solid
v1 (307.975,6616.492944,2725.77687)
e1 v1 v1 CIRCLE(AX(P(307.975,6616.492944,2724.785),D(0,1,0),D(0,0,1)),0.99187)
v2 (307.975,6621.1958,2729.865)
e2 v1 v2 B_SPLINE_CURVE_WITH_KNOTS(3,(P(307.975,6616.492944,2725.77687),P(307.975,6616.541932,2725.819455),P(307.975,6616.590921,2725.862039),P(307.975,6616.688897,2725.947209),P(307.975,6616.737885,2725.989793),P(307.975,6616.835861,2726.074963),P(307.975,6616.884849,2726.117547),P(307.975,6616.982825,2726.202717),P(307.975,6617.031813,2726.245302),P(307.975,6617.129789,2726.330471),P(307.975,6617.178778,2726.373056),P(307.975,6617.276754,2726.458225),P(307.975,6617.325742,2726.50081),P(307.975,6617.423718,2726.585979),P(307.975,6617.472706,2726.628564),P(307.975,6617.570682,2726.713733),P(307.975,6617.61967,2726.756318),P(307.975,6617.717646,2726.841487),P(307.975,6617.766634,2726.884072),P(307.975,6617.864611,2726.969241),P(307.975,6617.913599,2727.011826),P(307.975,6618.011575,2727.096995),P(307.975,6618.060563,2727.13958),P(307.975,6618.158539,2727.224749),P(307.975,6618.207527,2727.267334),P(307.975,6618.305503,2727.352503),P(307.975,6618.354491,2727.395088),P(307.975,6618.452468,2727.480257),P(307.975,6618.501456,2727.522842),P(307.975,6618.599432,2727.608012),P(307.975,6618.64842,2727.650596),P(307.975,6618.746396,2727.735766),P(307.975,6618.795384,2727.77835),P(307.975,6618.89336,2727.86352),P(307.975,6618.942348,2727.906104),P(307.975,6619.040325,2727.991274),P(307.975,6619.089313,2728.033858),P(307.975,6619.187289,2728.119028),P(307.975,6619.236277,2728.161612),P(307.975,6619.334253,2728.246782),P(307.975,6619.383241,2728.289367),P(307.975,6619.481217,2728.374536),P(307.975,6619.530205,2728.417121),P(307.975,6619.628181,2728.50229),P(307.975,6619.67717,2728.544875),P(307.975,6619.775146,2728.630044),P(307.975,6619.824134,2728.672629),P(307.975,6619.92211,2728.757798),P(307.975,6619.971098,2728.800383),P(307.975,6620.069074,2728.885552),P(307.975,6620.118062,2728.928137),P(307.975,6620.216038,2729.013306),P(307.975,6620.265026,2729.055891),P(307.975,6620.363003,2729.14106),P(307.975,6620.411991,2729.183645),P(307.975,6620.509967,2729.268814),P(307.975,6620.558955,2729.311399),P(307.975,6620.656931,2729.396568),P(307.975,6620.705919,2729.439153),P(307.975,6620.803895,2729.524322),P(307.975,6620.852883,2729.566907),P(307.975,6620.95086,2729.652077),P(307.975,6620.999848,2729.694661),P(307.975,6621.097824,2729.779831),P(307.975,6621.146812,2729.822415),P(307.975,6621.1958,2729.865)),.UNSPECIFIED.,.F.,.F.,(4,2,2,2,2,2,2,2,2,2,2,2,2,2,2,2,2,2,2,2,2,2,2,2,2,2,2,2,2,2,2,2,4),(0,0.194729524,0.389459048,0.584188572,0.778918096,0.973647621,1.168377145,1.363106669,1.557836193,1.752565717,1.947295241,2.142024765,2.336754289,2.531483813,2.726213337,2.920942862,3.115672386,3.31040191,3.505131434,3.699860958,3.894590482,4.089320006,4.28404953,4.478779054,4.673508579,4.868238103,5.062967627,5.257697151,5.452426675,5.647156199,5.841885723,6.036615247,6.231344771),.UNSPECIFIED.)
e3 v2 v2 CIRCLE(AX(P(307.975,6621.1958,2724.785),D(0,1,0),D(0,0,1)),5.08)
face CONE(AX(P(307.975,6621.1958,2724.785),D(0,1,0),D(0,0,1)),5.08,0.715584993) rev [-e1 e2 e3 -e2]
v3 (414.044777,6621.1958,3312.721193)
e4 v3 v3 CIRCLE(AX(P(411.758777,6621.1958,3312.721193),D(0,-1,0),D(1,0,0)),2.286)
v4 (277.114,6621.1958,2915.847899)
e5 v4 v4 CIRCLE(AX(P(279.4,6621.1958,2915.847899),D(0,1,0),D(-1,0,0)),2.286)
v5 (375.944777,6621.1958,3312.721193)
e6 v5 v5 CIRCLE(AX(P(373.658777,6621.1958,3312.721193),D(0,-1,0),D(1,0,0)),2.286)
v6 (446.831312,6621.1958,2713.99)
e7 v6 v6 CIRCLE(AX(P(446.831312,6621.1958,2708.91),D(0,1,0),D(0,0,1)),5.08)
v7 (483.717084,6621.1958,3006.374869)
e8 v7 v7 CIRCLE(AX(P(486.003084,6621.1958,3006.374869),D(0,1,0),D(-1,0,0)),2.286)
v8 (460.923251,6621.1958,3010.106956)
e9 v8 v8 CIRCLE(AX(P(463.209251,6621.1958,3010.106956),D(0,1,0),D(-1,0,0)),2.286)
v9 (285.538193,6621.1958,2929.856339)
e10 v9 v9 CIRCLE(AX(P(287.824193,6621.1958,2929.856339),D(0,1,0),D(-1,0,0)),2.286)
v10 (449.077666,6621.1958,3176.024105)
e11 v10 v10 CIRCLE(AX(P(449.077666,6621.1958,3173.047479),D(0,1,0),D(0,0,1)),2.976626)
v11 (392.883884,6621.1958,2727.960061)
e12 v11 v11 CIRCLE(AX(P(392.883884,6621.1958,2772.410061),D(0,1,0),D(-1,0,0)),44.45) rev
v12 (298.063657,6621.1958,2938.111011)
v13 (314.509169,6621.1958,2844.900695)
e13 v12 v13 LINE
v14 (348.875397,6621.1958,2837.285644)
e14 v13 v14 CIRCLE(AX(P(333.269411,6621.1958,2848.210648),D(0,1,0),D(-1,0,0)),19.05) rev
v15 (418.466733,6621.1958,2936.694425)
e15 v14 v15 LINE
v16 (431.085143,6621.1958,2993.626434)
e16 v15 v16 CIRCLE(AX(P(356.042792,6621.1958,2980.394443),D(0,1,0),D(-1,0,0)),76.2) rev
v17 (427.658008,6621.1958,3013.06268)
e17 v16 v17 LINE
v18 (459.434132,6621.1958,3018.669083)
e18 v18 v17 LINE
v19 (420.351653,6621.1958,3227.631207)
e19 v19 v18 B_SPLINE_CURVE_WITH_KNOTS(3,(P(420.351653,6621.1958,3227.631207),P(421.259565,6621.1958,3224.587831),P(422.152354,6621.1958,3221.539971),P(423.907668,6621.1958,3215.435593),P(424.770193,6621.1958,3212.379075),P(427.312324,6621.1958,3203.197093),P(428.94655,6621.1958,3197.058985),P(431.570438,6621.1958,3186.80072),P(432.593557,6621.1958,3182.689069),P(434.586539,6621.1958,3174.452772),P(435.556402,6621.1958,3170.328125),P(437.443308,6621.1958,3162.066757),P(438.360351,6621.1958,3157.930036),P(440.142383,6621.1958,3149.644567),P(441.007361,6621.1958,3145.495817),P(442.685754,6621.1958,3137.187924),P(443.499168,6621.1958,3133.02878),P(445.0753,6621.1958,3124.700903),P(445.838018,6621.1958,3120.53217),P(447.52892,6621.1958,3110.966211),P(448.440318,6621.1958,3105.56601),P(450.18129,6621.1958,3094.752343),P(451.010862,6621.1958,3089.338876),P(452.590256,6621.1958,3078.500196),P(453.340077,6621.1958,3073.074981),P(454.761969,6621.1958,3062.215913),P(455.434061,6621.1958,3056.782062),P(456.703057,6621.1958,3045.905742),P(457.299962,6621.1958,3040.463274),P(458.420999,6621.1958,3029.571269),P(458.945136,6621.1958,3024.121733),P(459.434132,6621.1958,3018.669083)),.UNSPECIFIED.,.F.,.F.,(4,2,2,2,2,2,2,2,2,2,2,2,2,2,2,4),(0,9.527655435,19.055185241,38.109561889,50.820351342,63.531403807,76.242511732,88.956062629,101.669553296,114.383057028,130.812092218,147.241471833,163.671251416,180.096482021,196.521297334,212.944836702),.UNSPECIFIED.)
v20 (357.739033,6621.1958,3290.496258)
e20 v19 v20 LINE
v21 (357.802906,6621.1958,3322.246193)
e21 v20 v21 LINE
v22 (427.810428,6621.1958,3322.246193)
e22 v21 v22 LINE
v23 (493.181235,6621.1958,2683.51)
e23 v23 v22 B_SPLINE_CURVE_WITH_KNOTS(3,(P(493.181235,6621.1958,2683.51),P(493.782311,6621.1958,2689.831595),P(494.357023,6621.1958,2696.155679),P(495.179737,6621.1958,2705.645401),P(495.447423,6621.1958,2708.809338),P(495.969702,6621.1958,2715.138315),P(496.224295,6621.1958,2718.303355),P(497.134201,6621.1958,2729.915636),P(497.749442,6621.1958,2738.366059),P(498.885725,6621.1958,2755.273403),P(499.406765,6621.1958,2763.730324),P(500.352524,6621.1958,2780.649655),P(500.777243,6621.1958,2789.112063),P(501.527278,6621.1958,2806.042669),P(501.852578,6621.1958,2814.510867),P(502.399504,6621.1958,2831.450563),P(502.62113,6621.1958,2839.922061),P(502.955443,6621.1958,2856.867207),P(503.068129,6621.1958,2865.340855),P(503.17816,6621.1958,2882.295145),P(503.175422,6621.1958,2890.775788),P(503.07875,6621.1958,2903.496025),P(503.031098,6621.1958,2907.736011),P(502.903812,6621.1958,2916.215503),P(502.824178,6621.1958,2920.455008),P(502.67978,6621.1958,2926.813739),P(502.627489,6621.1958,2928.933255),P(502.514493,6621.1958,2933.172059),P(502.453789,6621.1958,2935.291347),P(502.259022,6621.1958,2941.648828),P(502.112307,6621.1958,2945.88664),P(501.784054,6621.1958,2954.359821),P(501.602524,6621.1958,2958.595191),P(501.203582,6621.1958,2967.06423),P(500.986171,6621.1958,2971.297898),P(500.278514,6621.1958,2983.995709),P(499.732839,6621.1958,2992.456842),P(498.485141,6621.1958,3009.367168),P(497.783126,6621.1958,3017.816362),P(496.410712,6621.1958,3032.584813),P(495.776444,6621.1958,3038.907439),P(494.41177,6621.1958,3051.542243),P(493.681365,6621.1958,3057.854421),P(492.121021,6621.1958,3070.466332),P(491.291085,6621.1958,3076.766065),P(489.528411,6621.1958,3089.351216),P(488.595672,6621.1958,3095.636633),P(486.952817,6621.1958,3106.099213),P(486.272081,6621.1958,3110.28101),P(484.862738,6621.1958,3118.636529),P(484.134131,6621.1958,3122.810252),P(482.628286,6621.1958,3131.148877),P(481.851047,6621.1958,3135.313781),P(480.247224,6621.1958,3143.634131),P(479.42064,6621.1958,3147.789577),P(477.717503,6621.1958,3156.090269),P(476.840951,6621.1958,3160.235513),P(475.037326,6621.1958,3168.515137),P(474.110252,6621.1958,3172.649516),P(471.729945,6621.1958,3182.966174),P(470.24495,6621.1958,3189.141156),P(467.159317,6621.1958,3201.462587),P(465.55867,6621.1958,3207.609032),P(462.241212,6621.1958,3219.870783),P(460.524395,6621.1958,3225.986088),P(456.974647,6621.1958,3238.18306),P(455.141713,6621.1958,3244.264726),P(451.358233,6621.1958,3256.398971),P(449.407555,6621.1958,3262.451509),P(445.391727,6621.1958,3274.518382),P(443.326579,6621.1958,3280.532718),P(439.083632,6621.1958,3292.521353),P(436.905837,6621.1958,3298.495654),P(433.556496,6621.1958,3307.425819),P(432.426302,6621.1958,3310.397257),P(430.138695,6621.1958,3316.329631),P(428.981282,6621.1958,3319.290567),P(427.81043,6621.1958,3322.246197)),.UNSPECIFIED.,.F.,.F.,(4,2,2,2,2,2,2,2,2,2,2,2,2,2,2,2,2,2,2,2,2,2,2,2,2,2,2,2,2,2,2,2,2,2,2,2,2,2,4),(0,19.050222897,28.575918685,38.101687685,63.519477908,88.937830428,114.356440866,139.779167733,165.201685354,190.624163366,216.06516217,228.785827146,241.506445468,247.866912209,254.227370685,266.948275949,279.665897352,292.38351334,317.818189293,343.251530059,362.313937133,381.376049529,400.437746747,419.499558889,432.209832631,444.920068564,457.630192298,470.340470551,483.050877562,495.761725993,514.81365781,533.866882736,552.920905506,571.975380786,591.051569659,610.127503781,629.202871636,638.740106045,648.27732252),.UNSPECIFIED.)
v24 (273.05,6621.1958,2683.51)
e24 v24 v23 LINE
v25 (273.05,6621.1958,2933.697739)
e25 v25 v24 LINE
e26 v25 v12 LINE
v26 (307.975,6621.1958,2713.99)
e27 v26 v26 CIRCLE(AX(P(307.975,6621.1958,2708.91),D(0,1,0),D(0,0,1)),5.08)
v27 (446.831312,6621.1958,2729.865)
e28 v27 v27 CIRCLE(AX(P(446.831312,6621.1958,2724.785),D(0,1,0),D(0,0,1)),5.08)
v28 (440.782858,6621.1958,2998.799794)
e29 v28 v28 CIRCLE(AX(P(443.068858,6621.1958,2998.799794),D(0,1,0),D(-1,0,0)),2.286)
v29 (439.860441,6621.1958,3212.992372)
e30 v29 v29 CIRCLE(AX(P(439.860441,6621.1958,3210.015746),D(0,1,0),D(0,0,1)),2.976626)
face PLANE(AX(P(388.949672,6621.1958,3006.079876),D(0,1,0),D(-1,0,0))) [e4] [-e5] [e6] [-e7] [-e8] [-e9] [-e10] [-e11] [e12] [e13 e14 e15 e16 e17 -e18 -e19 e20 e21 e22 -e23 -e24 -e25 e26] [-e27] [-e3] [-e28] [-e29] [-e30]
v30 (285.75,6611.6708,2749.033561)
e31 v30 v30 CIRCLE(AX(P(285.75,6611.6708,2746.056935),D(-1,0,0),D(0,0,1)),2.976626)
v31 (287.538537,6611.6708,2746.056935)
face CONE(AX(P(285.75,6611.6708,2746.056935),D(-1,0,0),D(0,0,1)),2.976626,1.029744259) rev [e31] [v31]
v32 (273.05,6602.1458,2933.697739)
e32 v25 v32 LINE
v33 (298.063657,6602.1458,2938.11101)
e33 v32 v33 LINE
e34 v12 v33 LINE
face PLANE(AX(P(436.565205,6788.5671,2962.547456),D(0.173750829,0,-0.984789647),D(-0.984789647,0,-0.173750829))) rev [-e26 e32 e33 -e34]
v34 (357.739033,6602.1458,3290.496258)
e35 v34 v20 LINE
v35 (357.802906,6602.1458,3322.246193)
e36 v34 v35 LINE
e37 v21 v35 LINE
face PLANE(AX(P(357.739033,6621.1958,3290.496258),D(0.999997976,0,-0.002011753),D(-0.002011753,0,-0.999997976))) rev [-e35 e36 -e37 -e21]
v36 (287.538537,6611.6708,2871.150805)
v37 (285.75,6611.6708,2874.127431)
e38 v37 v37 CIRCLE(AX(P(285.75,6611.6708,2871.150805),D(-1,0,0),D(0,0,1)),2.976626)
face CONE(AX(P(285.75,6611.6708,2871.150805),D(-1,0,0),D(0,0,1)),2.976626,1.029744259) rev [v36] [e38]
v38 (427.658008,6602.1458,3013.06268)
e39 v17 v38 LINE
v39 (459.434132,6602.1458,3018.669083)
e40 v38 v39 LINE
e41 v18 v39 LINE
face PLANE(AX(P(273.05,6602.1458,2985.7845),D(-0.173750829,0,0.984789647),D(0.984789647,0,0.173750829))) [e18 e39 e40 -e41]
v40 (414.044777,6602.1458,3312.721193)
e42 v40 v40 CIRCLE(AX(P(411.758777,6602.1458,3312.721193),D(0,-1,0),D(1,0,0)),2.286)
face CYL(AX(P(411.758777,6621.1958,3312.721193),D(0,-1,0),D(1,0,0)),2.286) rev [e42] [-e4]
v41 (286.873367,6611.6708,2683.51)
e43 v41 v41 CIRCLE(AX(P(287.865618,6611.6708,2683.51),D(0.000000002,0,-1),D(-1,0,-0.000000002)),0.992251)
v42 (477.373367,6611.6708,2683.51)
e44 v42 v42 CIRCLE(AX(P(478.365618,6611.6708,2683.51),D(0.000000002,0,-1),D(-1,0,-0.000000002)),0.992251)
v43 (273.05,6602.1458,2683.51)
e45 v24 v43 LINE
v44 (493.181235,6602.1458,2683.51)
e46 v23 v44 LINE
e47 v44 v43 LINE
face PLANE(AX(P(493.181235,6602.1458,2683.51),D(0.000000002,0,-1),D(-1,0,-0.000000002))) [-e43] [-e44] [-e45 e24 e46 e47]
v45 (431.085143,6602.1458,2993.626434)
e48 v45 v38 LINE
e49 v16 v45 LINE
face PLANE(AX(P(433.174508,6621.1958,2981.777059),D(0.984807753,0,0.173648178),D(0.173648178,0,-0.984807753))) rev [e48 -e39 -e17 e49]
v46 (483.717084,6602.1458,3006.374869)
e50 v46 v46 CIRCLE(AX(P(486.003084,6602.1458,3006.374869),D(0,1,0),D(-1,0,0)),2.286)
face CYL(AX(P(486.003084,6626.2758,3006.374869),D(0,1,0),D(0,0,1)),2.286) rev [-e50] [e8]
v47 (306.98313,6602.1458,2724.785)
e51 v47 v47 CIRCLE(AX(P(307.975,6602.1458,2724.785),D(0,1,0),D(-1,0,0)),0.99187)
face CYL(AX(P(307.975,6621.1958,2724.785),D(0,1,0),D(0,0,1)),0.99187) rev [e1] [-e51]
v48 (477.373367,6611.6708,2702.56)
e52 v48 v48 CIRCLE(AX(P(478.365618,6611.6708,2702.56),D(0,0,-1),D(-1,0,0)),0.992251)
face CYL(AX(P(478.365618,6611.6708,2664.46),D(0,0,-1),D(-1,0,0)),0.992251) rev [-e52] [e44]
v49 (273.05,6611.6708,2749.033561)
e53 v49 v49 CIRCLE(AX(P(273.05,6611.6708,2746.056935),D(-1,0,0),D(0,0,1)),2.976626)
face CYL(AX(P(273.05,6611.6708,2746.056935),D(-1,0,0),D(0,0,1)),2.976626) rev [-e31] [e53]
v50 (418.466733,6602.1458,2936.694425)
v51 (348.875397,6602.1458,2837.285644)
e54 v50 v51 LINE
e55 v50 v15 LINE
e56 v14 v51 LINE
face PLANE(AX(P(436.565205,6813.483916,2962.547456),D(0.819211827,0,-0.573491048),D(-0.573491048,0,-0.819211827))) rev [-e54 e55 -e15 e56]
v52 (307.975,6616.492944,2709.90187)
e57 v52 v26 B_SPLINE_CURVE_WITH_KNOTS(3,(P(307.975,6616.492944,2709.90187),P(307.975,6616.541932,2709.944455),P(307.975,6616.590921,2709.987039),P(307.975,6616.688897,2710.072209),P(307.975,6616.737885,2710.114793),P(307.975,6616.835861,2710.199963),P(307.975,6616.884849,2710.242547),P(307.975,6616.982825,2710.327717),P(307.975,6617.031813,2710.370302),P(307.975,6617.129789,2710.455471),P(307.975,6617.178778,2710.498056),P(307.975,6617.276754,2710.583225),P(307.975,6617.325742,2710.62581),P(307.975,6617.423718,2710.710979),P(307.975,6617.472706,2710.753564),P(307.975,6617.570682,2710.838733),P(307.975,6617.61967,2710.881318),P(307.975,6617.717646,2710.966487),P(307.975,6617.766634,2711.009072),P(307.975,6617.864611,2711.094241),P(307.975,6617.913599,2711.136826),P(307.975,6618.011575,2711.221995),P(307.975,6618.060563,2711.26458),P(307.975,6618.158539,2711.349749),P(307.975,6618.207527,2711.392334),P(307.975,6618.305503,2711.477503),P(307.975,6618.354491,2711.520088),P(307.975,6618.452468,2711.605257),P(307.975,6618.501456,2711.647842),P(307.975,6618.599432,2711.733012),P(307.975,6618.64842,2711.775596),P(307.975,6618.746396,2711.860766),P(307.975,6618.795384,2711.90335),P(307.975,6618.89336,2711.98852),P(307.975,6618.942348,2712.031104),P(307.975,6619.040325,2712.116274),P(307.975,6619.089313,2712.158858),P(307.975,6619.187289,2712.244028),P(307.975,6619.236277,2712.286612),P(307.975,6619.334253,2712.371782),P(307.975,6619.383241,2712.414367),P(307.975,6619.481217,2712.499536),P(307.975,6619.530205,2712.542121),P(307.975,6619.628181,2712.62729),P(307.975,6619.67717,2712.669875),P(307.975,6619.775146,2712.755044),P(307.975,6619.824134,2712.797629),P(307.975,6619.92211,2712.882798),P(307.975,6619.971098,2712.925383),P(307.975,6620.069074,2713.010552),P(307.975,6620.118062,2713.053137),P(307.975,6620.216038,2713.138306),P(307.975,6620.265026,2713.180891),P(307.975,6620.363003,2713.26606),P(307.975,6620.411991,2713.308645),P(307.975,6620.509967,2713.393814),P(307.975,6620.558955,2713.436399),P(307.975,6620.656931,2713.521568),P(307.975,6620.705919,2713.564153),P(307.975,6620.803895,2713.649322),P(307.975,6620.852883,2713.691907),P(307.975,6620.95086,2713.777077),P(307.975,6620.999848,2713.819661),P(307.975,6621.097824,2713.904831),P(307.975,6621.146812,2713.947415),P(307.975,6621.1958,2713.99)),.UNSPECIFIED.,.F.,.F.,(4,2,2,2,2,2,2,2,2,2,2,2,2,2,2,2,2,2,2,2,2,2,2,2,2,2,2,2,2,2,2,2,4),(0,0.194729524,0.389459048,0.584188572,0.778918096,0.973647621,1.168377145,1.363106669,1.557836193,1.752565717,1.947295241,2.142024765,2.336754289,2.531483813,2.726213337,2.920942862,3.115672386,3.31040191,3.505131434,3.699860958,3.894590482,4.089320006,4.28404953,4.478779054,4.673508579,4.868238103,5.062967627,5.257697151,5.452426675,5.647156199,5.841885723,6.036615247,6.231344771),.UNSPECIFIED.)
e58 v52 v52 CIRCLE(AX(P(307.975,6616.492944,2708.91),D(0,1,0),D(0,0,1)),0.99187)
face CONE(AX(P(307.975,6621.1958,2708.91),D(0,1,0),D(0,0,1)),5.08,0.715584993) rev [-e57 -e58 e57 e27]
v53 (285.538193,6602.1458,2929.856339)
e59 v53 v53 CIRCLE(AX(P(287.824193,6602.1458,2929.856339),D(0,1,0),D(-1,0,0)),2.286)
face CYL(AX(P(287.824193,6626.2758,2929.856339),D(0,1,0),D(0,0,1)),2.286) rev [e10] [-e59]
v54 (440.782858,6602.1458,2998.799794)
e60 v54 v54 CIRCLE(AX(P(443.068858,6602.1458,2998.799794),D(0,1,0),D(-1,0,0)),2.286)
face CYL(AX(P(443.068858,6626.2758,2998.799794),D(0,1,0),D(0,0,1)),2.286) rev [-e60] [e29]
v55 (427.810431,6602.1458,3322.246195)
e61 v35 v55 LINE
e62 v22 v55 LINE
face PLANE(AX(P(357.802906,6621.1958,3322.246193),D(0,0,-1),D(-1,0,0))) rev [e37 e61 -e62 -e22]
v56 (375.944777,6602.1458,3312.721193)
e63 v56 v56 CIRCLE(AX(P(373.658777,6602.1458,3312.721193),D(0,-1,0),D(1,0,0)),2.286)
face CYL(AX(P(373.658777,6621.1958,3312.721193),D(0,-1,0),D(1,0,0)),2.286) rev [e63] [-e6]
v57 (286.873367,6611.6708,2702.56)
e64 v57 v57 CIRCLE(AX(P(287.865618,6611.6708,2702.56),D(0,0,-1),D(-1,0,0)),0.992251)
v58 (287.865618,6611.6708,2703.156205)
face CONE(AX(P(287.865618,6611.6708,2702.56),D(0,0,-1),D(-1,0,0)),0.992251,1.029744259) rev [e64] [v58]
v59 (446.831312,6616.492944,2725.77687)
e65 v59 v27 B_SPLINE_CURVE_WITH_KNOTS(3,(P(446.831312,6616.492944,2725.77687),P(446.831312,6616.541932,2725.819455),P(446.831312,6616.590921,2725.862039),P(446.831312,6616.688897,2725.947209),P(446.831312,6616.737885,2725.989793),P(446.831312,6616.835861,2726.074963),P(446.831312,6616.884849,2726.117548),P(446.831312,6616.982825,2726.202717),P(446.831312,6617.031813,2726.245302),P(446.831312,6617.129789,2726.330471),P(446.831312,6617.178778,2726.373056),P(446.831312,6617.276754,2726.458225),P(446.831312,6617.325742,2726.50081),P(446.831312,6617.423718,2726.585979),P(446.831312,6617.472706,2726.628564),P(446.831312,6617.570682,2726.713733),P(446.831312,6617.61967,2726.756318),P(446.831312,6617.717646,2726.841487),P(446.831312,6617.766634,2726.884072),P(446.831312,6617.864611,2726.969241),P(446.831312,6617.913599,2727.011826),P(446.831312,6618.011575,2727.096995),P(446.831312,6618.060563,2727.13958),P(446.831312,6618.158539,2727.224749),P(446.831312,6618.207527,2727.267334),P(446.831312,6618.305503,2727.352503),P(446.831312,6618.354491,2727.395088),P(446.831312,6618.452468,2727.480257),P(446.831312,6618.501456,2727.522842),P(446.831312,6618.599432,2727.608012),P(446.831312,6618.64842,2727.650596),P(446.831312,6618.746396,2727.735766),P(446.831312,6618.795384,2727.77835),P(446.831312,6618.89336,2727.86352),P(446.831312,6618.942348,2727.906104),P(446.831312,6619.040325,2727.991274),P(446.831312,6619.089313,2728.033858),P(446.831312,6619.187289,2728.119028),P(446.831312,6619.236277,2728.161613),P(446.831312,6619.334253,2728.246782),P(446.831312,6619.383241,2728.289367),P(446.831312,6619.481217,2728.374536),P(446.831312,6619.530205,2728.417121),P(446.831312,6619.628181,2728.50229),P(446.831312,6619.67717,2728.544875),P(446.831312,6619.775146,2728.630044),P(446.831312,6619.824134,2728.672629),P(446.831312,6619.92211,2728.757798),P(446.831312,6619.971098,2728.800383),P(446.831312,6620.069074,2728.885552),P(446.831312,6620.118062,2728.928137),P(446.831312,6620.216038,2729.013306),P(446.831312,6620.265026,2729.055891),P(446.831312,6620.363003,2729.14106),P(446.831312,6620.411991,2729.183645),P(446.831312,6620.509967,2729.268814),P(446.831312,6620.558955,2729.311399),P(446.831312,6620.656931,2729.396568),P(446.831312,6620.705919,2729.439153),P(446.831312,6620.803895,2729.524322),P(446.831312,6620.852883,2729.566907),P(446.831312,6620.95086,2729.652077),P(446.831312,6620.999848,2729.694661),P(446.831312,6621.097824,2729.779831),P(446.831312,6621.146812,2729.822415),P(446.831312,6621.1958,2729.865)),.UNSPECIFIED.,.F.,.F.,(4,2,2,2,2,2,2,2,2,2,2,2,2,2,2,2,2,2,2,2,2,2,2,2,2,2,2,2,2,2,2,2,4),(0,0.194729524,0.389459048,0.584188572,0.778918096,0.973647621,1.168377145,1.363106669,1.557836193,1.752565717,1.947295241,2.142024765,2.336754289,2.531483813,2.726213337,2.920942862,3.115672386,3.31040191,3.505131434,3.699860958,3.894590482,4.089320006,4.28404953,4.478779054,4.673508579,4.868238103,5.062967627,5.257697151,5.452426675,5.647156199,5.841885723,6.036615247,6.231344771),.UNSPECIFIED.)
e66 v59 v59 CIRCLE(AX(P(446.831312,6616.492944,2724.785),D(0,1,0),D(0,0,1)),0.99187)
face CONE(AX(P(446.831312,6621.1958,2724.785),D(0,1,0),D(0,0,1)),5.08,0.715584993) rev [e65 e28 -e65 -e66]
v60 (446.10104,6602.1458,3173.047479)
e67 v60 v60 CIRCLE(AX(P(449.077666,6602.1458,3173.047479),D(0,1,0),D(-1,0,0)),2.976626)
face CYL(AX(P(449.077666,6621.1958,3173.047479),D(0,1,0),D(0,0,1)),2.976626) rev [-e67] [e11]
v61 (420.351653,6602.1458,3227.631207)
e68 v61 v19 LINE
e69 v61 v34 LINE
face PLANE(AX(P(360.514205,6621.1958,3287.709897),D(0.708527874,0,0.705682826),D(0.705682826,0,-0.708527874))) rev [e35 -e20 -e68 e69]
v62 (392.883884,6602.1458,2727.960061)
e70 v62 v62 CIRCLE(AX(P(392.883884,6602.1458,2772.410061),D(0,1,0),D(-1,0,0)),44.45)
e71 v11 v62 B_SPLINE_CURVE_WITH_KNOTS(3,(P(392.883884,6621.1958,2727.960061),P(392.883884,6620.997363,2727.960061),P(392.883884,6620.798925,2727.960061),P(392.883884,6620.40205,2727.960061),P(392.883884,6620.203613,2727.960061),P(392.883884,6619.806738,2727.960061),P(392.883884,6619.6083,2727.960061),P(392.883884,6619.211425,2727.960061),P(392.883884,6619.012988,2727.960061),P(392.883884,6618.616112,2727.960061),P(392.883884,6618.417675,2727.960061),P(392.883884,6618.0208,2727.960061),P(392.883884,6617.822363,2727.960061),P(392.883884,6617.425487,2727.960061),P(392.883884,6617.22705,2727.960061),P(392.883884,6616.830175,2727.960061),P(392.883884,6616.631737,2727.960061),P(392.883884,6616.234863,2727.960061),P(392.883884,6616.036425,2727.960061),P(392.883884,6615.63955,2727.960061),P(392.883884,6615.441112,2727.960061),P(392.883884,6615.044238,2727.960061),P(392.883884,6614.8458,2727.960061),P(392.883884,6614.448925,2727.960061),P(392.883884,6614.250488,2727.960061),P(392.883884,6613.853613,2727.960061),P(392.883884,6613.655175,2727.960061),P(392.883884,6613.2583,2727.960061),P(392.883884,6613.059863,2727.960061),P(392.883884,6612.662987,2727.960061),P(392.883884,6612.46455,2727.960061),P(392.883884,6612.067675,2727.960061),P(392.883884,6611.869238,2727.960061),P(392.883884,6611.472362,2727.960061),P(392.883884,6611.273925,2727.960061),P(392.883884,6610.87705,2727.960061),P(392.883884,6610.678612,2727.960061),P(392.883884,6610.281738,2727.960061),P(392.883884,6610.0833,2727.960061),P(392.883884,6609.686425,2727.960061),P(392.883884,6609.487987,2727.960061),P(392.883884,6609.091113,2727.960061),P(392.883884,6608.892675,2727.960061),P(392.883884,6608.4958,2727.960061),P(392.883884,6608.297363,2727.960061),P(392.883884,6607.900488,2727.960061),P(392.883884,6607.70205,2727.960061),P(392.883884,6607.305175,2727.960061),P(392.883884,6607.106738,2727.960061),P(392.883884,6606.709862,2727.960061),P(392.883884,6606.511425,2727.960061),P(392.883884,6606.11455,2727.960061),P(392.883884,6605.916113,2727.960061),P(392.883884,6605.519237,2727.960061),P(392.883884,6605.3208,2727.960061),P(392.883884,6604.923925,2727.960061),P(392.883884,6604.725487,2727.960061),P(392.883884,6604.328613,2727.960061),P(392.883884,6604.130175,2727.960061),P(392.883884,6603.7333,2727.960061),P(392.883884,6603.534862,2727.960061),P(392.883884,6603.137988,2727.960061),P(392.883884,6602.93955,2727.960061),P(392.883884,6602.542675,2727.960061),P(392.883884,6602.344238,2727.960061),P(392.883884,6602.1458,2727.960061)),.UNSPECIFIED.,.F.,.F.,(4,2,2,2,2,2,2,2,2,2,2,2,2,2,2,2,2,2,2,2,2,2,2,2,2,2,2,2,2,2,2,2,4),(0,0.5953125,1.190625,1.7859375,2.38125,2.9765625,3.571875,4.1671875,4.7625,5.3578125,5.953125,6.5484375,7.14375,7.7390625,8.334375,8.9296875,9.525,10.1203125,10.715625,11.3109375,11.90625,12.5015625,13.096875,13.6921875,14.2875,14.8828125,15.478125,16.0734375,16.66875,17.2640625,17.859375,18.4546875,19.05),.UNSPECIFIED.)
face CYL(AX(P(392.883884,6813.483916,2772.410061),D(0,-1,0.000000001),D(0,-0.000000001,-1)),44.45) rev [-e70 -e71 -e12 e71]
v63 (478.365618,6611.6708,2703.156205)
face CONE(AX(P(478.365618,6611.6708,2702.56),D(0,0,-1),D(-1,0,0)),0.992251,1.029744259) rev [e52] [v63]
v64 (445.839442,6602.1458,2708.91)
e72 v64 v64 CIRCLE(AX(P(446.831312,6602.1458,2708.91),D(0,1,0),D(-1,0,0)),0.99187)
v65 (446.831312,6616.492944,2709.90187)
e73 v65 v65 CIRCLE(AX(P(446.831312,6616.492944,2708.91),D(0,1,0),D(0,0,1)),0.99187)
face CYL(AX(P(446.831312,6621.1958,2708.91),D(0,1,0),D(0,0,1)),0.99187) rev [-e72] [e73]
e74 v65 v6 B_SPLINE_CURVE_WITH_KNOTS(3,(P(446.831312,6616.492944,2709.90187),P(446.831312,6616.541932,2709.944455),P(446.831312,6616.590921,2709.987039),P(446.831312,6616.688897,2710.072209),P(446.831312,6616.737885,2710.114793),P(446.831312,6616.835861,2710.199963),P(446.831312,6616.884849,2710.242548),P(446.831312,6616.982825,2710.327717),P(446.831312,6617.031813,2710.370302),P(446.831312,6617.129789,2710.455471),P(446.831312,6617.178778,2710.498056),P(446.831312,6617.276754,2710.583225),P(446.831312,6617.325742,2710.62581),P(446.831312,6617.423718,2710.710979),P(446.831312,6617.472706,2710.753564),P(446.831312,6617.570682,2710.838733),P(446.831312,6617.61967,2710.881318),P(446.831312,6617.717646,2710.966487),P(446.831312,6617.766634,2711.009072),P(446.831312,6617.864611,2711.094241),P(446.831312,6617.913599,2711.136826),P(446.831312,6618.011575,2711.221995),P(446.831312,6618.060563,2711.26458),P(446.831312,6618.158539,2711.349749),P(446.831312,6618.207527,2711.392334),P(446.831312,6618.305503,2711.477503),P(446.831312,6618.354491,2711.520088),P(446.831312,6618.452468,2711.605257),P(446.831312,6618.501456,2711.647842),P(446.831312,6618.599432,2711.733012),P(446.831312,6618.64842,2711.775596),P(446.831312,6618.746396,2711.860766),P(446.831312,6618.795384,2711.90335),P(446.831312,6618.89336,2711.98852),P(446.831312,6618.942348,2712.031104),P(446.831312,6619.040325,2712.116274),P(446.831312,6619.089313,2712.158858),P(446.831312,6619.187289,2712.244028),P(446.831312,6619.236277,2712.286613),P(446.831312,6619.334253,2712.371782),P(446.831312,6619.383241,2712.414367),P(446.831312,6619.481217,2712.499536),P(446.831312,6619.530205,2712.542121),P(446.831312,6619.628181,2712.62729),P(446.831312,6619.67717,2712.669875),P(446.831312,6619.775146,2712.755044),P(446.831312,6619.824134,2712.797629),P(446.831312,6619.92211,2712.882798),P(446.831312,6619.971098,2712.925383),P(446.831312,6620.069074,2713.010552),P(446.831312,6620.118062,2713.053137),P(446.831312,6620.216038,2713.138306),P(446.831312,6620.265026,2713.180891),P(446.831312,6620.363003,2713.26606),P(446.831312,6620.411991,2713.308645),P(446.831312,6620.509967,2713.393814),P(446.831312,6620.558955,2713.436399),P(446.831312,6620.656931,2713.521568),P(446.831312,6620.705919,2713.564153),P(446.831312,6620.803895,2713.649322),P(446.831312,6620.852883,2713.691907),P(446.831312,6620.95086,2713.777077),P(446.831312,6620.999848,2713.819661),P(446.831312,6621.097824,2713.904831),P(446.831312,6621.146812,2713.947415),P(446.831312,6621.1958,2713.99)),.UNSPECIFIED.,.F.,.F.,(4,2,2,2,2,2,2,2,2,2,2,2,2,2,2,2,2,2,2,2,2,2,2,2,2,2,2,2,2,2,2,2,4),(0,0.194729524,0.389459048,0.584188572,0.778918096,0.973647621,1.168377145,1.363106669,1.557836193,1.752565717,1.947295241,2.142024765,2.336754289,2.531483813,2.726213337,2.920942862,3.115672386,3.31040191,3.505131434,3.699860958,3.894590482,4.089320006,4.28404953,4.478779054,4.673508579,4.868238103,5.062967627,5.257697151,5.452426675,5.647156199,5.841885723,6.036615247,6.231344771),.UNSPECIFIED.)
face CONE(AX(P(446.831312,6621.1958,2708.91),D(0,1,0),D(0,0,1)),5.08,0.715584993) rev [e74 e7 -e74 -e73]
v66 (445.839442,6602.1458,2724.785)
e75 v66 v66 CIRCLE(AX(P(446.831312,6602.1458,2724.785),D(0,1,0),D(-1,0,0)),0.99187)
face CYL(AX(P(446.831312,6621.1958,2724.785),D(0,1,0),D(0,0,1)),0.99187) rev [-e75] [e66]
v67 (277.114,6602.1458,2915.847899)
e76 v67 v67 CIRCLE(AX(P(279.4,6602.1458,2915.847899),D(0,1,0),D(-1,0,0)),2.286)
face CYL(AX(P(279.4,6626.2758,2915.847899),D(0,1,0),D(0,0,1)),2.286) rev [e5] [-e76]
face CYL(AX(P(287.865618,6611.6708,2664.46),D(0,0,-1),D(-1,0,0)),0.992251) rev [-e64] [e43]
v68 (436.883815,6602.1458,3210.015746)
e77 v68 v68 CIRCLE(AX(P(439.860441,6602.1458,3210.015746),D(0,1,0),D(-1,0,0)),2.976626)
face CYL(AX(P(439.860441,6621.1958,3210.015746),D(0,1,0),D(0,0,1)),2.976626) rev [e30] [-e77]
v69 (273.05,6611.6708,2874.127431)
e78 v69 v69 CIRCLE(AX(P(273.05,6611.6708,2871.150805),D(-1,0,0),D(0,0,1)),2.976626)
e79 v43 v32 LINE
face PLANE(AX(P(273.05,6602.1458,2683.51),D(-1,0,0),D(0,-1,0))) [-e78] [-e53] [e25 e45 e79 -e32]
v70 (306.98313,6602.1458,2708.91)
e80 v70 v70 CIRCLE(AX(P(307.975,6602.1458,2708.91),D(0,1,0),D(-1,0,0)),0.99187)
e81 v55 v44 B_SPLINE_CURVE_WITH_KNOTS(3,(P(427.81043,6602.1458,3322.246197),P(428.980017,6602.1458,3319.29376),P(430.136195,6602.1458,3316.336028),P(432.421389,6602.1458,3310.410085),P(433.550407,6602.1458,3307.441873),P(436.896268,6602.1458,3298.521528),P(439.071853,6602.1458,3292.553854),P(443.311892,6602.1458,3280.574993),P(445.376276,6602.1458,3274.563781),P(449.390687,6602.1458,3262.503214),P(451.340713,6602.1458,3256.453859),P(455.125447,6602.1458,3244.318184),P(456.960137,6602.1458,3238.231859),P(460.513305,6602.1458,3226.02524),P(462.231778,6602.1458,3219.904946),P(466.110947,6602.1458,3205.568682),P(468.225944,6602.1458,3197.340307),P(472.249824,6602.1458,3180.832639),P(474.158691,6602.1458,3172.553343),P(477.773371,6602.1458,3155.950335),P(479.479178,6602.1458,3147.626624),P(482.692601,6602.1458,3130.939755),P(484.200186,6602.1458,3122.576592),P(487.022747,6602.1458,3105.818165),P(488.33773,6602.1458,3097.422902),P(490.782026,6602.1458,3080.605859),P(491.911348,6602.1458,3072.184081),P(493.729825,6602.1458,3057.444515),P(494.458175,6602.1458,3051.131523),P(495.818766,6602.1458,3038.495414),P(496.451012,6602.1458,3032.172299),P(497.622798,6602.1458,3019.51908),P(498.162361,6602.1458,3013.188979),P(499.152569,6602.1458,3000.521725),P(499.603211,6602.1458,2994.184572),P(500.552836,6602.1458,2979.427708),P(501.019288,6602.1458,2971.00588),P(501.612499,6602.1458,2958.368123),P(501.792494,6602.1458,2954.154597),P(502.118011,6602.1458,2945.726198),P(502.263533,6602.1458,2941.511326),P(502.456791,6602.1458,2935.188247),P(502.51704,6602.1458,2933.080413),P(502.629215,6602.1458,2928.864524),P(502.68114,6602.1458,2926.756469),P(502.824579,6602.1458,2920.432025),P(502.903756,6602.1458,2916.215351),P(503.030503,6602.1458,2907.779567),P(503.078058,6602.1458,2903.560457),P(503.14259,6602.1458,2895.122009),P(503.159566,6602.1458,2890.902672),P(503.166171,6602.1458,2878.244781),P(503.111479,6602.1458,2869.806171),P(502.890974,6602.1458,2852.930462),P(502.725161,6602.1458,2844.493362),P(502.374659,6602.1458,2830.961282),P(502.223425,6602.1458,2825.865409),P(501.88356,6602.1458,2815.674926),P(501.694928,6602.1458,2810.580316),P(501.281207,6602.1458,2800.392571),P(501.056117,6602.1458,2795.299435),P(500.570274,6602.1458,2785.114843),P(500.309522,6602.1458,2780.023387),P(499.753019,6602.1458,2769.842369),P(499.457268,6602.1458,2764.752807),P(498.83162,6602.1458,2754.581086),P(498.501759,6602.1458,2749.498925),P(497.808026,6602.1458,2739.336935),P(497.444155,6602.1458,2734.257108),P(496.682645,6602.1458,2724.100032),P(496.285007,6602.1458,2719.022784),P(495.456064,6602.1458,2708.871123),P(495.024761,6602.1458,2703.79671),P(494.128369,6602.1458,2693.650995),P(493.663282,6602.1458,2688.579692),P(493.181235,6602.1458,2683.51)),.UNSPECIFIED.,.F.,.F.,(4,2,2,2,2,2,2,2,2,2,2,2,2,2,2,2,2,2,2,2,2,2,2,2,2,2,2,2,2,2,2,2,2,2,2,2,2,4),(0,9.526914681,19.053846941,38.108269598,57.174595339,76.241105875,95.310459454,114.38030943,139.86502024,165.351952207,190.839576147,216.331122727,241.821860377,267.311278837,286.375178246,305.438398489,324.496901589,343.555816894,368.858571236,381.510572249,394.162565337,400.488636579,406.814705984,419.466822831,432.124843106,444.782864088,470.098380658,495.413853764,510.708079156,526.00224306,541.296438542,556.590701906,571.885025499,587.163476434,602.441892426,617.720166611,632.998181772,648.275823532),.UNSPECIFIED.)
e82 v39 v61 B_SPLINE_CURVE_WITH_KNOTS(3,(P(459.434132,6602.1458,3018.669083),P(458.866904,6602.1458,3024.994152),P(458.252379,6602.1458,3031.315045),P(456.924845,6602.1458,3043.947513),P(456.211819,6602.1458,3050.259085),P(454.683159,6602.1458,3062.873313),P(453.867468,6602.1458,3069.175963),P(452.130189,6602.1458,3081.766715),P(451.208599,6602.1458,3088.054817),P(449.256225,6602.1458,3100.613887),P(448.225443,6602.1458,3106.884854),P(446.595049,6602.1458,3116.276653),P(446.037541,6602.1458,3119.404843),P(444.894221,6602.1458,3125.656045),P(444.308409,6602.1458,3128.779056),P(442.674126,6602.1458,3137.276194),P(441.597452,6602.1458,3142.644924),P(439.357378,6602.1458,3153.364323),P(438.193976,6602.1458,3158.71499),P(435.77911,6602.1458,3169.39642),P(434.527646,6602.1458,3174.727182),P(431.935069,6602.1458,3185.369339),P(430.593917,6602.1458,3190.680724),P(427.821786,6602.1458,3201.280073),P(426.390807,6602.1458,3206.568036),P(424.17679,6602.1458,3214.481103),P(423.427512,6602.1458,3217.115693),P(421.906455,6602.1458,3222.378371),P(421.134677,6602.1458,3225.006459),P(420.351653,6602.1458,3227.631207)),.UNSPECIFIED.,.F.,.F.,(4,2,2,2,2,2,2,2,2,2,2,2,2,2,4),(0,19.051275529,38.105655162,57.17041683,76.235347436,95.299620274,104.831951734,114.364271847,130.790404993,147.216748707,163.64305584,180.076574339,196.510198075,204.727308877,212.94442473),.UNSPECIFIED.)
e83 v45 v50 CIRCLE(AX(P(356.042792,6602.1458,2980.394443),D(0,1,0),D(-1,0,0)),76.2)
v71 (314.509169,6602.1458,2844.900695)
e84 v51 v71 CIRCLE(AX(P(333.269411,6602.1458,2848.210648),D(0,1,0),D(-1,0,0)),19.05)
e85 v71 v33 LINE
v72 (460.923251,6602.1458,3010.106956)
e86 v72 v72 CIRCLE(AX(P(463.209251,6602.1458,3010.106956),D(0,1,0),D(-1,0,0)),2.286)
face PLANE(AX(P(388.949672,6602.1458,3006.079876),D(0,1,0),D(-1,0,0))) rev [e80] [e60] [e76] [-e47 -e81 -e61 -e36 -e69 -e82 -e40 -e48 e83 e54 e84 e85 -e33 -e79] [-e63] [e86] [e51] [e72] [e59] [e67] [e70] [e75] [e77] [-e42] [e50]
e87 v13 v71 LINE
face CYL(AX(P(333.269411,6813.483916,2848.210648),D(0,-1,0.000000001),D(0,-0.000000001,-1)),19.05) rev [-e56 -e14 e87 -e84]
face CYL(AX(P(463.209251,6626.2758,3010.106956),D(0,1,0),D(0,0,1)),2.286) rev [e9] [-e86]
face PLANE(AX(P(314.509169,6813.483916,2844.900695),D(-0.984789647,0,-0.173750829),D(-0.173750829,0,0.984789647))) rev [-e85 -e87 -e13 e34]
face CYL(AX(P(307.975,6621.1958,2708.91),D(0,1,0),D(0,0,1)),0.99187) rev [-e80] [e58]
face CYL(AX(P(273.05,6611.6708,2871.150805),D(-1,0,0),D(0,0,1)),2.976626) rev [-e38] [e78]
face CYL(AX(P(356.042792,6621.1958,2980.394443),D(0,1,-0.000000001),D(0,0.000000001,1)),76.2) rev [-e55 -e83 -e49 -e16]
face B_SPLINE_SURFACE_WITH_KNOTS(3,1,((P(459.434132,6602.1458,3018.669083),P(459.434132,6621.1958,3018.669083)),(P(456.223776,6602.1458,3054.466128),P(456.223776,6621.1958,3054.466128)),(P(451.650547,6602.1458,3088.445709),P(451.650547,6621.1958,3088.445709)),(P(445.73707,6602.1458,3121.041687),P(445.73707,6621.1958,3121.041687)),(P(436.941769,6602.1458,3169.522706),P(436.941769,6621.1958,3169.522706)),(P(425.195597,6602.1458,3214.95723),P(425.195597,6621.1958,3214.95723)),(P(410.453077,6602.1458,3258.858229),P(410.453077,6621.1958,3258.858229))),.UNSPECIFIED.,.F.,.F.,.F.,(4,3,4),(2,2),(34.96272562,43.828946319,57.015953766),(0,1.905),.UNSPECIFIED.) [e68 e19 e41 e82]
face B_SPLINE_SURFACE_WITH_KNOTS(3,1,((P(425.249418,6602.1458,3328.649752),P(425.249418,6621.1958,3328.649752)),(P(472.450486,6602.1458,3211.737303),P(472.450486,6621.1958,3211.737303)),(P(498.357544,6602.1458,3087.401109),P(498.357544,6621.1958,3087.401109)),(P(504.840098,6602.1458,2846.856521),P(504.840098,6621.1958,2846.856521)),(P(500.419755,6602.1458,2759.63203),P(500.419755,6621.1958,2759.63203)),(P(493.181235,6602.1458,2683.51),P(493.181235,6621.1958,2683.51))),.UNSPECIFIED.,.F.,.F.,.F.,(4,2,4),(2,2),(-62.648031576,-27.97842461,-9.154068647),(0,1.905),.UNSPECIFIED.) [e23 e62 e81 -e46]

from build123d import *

# Parameters (mm, degrees)
STOCK_LEFT_START                     = 6602.1458
STOCK_LEFT_CONSOLE_1_OUTLINE_R       = 2.286
STOCK_LEFT_CONSOLE_1_OUTLINE_R_2     = 44.45
STOCK_LEFT_CONSOLE_1_DEPTH           = 19.05
SKETCH1_R                            = 2.286
BOSS_EXTRUDE1_DEPTH                  = 19.05
F_5_64_0_07813_DIAMETER_HOLE1_D      = 1.984502
F_5_64_0_07813_DIAMETER_HOLE1_DEPTH  = 38.1
F_5_64_0_07813_DIAMETER_HOLE1_TIP    = 0.59620455
HOLE1_D                              = 1.98374
HOLE1_DEPTH                          = 19.05
HOLE1_CSINK_D                        = 10.16
HOLE1_CSINK_ANGLE                    = 82
HOLE1_TIP                            = 0.595975622
F_15_64_0_23438_DIAMETER_HOLE1_D     = 5.953252
F_15_64_0_23438_DIAMETER_HOLE1_DEPTH = 12.7
F_15_64_0_23438_DIAMETER_HOLE1_TIP   = 1.788537341
F_15_64_0_23438_DIAMETER_HOLE2_D     = 5.953252


# Read off the part's stored shape, not the designer's step: Stock-Left Console-1
with BuildPart() as part:
    # Stock-Left Console-1 outline → Stock-Left Console-1 (new body)
    with BuildSketch(Plane(origin=(0, 0, 0), x_dir=(1, 0, 0), z_dir=(0, 1, 0)).offset(STOCK_LEFT_START)):
        with BuildLine():
            Line((357.802906487, -3322.246193472), (427.81043067, -3322.246195127))
            add(Edge.make_bspline(
                [(427.81043067, -3322.246195127), (473.388143546, -3207.192047458), (498.434160064, -3084.558176537), (504.840097902, -2846.856520671), (500.419755279, -2759.632030412), (493.181235291, -2683.510000386)],
                knots=[-62.01580073, -62.01580073, -62.01580073, -62.01580073, -27.97842461, -27.97842461, -9.154068647, -9.154068647, -9.154068647, -9.154068647], degree=3))
            Line((493.181235291, -2683.510000386), (273.05, -2683.510000011))
            Line((273.05, -2683.510000011), (273.05, -2933.697739453))
            Line((273.05, -2933.697739453), (298.063657014, -2938.111010516))
            Line((298.063657014, -2938.111010516), (314.509168719, -2844.900694709))
            ThreePointArc((314.509168719, -2844.900694709), (329.148175534, -2829.611779383), (348.875396841, -2837.285643591))
            Line((348.875396841, -2837.285643591), (418.46673346, -2936.69442468))
            ThreePointArc((418.46673346, -2936.69442468), (430.437407433, -2963.905621235), (431.085143003, -2993.626433673))
            Line((431.085143003, -2993.626433673), (427.658008361, -3013.062680059))
            Line((427.658008361, -3013.062680059), (459.43413222, -3018.669083307))
            add(Edge.make_bspline(
                [(459.43413222, -3018.669083307), (456.223775647, -3054.466127933), (451.650547457, -3088.445708947), (445.737069512, -3121.041687467), (439.008868755, -3158.128540481), (430.553849402, -3193.432616991), (420.351653238, -3227.631207238)],
                knots=[34.96272562, 34.96272562, 34.96272562, 34.96272562, 43.828946319, 43.828946319, 43.828946319, 53.916700663, 53.916700663, 53.916700663, 53.916700663], degree=3))
            Line((420.351653238, -3227.631207238), (357.739033333, -3290.49625772))
            Line((357.739033333, -3290.49625772), (357.802906487, -3322.246193472))
        make_face()
        with Locations((373.658776627, -3312.721193497)):
            Circle(STOCK_LEFT_CONSOLE_1_OUTLINE_R, mode=Mode.SUBTRACT)
        with Locations((411.758776627, -3312.721193478)):
            Circle(STOCK_LEFT_CONSOLE_1_OUTLINE_R, mode=Mode.SUBTRACT)
        with Locations((463.209250621, -3010.106955909)):
            Circle(STOCK_LEFT_CONSOLE_1_OUTLINE_R, mode=Mode.SUBTRACT)
        with Locations((486.003084481, -3006.374869262)):
            Circle(STOCK_LEFT_CONSOLE_1_OUTLINE_R, mode=Mode.SUBTRACT)
        with Locations((287.824193289, -2929.856338812)):
            Circle(STOCK_LEFT_CONSOLE_1_OUTLINE_R, mode=Mode.SUBTRACT)
        with Locations((279.4, -2915.847898591)):
            Circle(STOCK_LEFT_CONSOLE_1_OUTLINE_R, mode=Mode.SUBTRACT)
        with Locations((292.1, -2727.960000043)):
            Circle(STOCK_LEFT_CONSOLE_1_OUTLINE_R, mode=Mode.SUBTRACT)
        with Locations((292.1, -2702.559999968)):
            Circle(STOCK_LEFT_CONSOLE_1_OUTLINE_R, mode=Mode.SUBTRACT)
        with Locations((317.5, -2702.559999968)):
            Circle(STOCK_LEFT_CONSOLE_1_OUTLINE_R, mode=Mode.SUBTRACT)
        with Locations((443.068858037, -2998.799793605)):
            Circle(STOCK_LEFT_CONSOLE_1_OUTLINE_R, mode=Mode.SUBTRACT)
        with Locations((392.883884122, -2772.410060986)):
            Circle(STOCK_LEFT_CONSOLE_1_OUTLINE_R_2, mode=Mode.SUBTRACT)
        with Locations((450.85, -2727.960000048)):
            Circle(STOCK_LEFT_CONSOLE_1_OUTLINE_R, mode=Mode.SUBTRACT)
        with Locations((450.85, -2702.560000048)):
            Circle(STOCK_LEFT_CONSOLE_1_OUTLINE_R, mode=Mode.SUBTRACT)
    extrude(amount=STOCK_LEFT_CONSOLE_1_DEPTH)

    # Sketch1 → Boss-Extrude1 (add)
    with BuildSketch(Plane(origin=(0, 6621.1958, 0), x_dir=(1, 0, 0), z_dir=(0, 1, 0))):
        with Locations((292.1, -2727.959998746)):
            Circle(SKETCH1_R)
        with Locations((292.1, -2702.559998672)):
            Circle(SKETCH1_R)
        with Locations((317.5, -2702.559998672)):
            Circle(SKETCH1_R)
        with Locations((450.85, -2702.559998751)):
            Circle(SKETCH1_R)
        with Locations((450.85, -2727.959998751)):
            Circle(SKETCH1_R)
    extrude(amount=-BOSS_EXTRUDE1_DEPTH)

    # 5/64 (0.07813) Diameter Hole1
    with Locations(Plane(origin=(0, 0, 2664.46), x_dir=(-1, 0, 0), z_dir=(0, 0, -1))):
        with Locations((-481.589248274, 6993.254992531), (-386.339248274, 6993.254992531), (-291.089248274, 6993.254992531), (-295.274999999, 6965.135938475), (-295.274999999, 6812.735938475), (-295.274999999, 6660.335938474), (-285.166362357, 6631.468843414), (-475.477307398, 6631.468752771), (-485.002307398, 6660.335938474), (-485.002307398, 6812.735938474), (-485.002307398, 6965.135938474), (-478.365617646, 6611.6708), (-287.865617646, 6611.6708), (-307.975, 6564.3379), (-307.975, 6488.1379), (-284.960913066, 6440.805), (-380.210913066, 6440.805), (-475.460913066, 6440.805), (-446.831312422, 6488.1379), (-446.831312422, 6564.3379), (-472.231312422, 6396.355), (-472.231312422, 6320.155), (-472.653156211, 6275.705000839), (-377.403156211, 6275.705000839), (-282.153156211, 6275.705000839), (-282.575, 6320.155), (-282.575, 6396.355), (-435.598646187, 6221.729999816), (-435.598646187, 6145.529999816), (-450.592518112, 6091.554999951), (-460.998646187, 6091.555478285), (-460.998646187, 6056.629999944), (-460.998646187, 5980.429999944), (-460.998646187, 5945.505000042), (-282.153156211, 5945.505000042), (-368.611823093, 5945.505000042)):
            Hole(F_5_64_0_07813_DIAMETER_HOLE1_D / 2, depth=F_5_64_0_07813_DIAMETER_HOLE1_DEPTH)
            with Locations((0, 0, -(F_5_64_0_07813_DIAMETER_HOLE1_DEPTH + F_5_64_0_07813_DIAMETER_HOLE1_TIP / 2))):  # 118° drill point
                Cone(0, F_5_64_0_07813_DIAMETER_HOLE1_D / 2, F_5_64_0_07813_DIAMETER_HOLE1_TIP, mode=Mode.SUBTRACT)

    # Hole1
    with Locations(Plane(origin=(0, 6621.1958, 0), x_dir=(1, 0, 0), z_dir=(0, 1, 0))):
        with Locations((307.975, -2724.785), (307.975, -2708.91), (446.831312422, -2724.785), (446.831312422, -2708.91)):
            CounterSinkHole(HOLE1_D / 2, HOLE1_CSINK_D / 2, depth=HOLE1_DEPTH, counter_sink_angle=HOLE1_CSINK_ANGLE)
            with Locations((0, 0, -(HOLE1_DEPTH + HOLE1_TIP / 2))):  # 118° drill point
                Cone(0, HOLE1_D / 2, HOLE1_TIP, mode=Mode.SUBTRACT)

    # 15/64 (0.23438) Diameter Hole1
    with Locations(Plane.ZY.offset(-273.05)):
        with Locations((2746.056935059, 6611.6708), (2871.150804655, 6611.6708)):
            Hole(F_15_64_0_23438_DIAMETER_HOLE1_D / 2, depth=F_15_64_0_23438_DIAMETER_HOLE1_DEPTH)
            with Locations((0, 0, -(F_15_64_0_23438_DIAMETER_HOLE1_DEPTH + F_15_64_0_23438_DIAMETER_HOLE1_TIP / 2))):  # 118° drill point
                Cone(0, F_15_64_0_23438_DIAMETER_HOLE1_D / 2, F_15_64_0_23438_DIAMETER_HOLE1_TIP, mode=Mode.SUBTRACT)

    # 15/64 (0.23438) Diameter Hole2 (through all)
    with Locations(Plane(origin=(0, 6621.1958, 0), x_dir=(1, 0, 0), z_dir=(0, 1, 0))):
        with Locations((439.860441392, -3210.015746304), (449.077665614, -3173.047479133)):
            Hole(F_15_64_0_23438_DIAMETER_HOLE2_D / 2)


solid = part.part
